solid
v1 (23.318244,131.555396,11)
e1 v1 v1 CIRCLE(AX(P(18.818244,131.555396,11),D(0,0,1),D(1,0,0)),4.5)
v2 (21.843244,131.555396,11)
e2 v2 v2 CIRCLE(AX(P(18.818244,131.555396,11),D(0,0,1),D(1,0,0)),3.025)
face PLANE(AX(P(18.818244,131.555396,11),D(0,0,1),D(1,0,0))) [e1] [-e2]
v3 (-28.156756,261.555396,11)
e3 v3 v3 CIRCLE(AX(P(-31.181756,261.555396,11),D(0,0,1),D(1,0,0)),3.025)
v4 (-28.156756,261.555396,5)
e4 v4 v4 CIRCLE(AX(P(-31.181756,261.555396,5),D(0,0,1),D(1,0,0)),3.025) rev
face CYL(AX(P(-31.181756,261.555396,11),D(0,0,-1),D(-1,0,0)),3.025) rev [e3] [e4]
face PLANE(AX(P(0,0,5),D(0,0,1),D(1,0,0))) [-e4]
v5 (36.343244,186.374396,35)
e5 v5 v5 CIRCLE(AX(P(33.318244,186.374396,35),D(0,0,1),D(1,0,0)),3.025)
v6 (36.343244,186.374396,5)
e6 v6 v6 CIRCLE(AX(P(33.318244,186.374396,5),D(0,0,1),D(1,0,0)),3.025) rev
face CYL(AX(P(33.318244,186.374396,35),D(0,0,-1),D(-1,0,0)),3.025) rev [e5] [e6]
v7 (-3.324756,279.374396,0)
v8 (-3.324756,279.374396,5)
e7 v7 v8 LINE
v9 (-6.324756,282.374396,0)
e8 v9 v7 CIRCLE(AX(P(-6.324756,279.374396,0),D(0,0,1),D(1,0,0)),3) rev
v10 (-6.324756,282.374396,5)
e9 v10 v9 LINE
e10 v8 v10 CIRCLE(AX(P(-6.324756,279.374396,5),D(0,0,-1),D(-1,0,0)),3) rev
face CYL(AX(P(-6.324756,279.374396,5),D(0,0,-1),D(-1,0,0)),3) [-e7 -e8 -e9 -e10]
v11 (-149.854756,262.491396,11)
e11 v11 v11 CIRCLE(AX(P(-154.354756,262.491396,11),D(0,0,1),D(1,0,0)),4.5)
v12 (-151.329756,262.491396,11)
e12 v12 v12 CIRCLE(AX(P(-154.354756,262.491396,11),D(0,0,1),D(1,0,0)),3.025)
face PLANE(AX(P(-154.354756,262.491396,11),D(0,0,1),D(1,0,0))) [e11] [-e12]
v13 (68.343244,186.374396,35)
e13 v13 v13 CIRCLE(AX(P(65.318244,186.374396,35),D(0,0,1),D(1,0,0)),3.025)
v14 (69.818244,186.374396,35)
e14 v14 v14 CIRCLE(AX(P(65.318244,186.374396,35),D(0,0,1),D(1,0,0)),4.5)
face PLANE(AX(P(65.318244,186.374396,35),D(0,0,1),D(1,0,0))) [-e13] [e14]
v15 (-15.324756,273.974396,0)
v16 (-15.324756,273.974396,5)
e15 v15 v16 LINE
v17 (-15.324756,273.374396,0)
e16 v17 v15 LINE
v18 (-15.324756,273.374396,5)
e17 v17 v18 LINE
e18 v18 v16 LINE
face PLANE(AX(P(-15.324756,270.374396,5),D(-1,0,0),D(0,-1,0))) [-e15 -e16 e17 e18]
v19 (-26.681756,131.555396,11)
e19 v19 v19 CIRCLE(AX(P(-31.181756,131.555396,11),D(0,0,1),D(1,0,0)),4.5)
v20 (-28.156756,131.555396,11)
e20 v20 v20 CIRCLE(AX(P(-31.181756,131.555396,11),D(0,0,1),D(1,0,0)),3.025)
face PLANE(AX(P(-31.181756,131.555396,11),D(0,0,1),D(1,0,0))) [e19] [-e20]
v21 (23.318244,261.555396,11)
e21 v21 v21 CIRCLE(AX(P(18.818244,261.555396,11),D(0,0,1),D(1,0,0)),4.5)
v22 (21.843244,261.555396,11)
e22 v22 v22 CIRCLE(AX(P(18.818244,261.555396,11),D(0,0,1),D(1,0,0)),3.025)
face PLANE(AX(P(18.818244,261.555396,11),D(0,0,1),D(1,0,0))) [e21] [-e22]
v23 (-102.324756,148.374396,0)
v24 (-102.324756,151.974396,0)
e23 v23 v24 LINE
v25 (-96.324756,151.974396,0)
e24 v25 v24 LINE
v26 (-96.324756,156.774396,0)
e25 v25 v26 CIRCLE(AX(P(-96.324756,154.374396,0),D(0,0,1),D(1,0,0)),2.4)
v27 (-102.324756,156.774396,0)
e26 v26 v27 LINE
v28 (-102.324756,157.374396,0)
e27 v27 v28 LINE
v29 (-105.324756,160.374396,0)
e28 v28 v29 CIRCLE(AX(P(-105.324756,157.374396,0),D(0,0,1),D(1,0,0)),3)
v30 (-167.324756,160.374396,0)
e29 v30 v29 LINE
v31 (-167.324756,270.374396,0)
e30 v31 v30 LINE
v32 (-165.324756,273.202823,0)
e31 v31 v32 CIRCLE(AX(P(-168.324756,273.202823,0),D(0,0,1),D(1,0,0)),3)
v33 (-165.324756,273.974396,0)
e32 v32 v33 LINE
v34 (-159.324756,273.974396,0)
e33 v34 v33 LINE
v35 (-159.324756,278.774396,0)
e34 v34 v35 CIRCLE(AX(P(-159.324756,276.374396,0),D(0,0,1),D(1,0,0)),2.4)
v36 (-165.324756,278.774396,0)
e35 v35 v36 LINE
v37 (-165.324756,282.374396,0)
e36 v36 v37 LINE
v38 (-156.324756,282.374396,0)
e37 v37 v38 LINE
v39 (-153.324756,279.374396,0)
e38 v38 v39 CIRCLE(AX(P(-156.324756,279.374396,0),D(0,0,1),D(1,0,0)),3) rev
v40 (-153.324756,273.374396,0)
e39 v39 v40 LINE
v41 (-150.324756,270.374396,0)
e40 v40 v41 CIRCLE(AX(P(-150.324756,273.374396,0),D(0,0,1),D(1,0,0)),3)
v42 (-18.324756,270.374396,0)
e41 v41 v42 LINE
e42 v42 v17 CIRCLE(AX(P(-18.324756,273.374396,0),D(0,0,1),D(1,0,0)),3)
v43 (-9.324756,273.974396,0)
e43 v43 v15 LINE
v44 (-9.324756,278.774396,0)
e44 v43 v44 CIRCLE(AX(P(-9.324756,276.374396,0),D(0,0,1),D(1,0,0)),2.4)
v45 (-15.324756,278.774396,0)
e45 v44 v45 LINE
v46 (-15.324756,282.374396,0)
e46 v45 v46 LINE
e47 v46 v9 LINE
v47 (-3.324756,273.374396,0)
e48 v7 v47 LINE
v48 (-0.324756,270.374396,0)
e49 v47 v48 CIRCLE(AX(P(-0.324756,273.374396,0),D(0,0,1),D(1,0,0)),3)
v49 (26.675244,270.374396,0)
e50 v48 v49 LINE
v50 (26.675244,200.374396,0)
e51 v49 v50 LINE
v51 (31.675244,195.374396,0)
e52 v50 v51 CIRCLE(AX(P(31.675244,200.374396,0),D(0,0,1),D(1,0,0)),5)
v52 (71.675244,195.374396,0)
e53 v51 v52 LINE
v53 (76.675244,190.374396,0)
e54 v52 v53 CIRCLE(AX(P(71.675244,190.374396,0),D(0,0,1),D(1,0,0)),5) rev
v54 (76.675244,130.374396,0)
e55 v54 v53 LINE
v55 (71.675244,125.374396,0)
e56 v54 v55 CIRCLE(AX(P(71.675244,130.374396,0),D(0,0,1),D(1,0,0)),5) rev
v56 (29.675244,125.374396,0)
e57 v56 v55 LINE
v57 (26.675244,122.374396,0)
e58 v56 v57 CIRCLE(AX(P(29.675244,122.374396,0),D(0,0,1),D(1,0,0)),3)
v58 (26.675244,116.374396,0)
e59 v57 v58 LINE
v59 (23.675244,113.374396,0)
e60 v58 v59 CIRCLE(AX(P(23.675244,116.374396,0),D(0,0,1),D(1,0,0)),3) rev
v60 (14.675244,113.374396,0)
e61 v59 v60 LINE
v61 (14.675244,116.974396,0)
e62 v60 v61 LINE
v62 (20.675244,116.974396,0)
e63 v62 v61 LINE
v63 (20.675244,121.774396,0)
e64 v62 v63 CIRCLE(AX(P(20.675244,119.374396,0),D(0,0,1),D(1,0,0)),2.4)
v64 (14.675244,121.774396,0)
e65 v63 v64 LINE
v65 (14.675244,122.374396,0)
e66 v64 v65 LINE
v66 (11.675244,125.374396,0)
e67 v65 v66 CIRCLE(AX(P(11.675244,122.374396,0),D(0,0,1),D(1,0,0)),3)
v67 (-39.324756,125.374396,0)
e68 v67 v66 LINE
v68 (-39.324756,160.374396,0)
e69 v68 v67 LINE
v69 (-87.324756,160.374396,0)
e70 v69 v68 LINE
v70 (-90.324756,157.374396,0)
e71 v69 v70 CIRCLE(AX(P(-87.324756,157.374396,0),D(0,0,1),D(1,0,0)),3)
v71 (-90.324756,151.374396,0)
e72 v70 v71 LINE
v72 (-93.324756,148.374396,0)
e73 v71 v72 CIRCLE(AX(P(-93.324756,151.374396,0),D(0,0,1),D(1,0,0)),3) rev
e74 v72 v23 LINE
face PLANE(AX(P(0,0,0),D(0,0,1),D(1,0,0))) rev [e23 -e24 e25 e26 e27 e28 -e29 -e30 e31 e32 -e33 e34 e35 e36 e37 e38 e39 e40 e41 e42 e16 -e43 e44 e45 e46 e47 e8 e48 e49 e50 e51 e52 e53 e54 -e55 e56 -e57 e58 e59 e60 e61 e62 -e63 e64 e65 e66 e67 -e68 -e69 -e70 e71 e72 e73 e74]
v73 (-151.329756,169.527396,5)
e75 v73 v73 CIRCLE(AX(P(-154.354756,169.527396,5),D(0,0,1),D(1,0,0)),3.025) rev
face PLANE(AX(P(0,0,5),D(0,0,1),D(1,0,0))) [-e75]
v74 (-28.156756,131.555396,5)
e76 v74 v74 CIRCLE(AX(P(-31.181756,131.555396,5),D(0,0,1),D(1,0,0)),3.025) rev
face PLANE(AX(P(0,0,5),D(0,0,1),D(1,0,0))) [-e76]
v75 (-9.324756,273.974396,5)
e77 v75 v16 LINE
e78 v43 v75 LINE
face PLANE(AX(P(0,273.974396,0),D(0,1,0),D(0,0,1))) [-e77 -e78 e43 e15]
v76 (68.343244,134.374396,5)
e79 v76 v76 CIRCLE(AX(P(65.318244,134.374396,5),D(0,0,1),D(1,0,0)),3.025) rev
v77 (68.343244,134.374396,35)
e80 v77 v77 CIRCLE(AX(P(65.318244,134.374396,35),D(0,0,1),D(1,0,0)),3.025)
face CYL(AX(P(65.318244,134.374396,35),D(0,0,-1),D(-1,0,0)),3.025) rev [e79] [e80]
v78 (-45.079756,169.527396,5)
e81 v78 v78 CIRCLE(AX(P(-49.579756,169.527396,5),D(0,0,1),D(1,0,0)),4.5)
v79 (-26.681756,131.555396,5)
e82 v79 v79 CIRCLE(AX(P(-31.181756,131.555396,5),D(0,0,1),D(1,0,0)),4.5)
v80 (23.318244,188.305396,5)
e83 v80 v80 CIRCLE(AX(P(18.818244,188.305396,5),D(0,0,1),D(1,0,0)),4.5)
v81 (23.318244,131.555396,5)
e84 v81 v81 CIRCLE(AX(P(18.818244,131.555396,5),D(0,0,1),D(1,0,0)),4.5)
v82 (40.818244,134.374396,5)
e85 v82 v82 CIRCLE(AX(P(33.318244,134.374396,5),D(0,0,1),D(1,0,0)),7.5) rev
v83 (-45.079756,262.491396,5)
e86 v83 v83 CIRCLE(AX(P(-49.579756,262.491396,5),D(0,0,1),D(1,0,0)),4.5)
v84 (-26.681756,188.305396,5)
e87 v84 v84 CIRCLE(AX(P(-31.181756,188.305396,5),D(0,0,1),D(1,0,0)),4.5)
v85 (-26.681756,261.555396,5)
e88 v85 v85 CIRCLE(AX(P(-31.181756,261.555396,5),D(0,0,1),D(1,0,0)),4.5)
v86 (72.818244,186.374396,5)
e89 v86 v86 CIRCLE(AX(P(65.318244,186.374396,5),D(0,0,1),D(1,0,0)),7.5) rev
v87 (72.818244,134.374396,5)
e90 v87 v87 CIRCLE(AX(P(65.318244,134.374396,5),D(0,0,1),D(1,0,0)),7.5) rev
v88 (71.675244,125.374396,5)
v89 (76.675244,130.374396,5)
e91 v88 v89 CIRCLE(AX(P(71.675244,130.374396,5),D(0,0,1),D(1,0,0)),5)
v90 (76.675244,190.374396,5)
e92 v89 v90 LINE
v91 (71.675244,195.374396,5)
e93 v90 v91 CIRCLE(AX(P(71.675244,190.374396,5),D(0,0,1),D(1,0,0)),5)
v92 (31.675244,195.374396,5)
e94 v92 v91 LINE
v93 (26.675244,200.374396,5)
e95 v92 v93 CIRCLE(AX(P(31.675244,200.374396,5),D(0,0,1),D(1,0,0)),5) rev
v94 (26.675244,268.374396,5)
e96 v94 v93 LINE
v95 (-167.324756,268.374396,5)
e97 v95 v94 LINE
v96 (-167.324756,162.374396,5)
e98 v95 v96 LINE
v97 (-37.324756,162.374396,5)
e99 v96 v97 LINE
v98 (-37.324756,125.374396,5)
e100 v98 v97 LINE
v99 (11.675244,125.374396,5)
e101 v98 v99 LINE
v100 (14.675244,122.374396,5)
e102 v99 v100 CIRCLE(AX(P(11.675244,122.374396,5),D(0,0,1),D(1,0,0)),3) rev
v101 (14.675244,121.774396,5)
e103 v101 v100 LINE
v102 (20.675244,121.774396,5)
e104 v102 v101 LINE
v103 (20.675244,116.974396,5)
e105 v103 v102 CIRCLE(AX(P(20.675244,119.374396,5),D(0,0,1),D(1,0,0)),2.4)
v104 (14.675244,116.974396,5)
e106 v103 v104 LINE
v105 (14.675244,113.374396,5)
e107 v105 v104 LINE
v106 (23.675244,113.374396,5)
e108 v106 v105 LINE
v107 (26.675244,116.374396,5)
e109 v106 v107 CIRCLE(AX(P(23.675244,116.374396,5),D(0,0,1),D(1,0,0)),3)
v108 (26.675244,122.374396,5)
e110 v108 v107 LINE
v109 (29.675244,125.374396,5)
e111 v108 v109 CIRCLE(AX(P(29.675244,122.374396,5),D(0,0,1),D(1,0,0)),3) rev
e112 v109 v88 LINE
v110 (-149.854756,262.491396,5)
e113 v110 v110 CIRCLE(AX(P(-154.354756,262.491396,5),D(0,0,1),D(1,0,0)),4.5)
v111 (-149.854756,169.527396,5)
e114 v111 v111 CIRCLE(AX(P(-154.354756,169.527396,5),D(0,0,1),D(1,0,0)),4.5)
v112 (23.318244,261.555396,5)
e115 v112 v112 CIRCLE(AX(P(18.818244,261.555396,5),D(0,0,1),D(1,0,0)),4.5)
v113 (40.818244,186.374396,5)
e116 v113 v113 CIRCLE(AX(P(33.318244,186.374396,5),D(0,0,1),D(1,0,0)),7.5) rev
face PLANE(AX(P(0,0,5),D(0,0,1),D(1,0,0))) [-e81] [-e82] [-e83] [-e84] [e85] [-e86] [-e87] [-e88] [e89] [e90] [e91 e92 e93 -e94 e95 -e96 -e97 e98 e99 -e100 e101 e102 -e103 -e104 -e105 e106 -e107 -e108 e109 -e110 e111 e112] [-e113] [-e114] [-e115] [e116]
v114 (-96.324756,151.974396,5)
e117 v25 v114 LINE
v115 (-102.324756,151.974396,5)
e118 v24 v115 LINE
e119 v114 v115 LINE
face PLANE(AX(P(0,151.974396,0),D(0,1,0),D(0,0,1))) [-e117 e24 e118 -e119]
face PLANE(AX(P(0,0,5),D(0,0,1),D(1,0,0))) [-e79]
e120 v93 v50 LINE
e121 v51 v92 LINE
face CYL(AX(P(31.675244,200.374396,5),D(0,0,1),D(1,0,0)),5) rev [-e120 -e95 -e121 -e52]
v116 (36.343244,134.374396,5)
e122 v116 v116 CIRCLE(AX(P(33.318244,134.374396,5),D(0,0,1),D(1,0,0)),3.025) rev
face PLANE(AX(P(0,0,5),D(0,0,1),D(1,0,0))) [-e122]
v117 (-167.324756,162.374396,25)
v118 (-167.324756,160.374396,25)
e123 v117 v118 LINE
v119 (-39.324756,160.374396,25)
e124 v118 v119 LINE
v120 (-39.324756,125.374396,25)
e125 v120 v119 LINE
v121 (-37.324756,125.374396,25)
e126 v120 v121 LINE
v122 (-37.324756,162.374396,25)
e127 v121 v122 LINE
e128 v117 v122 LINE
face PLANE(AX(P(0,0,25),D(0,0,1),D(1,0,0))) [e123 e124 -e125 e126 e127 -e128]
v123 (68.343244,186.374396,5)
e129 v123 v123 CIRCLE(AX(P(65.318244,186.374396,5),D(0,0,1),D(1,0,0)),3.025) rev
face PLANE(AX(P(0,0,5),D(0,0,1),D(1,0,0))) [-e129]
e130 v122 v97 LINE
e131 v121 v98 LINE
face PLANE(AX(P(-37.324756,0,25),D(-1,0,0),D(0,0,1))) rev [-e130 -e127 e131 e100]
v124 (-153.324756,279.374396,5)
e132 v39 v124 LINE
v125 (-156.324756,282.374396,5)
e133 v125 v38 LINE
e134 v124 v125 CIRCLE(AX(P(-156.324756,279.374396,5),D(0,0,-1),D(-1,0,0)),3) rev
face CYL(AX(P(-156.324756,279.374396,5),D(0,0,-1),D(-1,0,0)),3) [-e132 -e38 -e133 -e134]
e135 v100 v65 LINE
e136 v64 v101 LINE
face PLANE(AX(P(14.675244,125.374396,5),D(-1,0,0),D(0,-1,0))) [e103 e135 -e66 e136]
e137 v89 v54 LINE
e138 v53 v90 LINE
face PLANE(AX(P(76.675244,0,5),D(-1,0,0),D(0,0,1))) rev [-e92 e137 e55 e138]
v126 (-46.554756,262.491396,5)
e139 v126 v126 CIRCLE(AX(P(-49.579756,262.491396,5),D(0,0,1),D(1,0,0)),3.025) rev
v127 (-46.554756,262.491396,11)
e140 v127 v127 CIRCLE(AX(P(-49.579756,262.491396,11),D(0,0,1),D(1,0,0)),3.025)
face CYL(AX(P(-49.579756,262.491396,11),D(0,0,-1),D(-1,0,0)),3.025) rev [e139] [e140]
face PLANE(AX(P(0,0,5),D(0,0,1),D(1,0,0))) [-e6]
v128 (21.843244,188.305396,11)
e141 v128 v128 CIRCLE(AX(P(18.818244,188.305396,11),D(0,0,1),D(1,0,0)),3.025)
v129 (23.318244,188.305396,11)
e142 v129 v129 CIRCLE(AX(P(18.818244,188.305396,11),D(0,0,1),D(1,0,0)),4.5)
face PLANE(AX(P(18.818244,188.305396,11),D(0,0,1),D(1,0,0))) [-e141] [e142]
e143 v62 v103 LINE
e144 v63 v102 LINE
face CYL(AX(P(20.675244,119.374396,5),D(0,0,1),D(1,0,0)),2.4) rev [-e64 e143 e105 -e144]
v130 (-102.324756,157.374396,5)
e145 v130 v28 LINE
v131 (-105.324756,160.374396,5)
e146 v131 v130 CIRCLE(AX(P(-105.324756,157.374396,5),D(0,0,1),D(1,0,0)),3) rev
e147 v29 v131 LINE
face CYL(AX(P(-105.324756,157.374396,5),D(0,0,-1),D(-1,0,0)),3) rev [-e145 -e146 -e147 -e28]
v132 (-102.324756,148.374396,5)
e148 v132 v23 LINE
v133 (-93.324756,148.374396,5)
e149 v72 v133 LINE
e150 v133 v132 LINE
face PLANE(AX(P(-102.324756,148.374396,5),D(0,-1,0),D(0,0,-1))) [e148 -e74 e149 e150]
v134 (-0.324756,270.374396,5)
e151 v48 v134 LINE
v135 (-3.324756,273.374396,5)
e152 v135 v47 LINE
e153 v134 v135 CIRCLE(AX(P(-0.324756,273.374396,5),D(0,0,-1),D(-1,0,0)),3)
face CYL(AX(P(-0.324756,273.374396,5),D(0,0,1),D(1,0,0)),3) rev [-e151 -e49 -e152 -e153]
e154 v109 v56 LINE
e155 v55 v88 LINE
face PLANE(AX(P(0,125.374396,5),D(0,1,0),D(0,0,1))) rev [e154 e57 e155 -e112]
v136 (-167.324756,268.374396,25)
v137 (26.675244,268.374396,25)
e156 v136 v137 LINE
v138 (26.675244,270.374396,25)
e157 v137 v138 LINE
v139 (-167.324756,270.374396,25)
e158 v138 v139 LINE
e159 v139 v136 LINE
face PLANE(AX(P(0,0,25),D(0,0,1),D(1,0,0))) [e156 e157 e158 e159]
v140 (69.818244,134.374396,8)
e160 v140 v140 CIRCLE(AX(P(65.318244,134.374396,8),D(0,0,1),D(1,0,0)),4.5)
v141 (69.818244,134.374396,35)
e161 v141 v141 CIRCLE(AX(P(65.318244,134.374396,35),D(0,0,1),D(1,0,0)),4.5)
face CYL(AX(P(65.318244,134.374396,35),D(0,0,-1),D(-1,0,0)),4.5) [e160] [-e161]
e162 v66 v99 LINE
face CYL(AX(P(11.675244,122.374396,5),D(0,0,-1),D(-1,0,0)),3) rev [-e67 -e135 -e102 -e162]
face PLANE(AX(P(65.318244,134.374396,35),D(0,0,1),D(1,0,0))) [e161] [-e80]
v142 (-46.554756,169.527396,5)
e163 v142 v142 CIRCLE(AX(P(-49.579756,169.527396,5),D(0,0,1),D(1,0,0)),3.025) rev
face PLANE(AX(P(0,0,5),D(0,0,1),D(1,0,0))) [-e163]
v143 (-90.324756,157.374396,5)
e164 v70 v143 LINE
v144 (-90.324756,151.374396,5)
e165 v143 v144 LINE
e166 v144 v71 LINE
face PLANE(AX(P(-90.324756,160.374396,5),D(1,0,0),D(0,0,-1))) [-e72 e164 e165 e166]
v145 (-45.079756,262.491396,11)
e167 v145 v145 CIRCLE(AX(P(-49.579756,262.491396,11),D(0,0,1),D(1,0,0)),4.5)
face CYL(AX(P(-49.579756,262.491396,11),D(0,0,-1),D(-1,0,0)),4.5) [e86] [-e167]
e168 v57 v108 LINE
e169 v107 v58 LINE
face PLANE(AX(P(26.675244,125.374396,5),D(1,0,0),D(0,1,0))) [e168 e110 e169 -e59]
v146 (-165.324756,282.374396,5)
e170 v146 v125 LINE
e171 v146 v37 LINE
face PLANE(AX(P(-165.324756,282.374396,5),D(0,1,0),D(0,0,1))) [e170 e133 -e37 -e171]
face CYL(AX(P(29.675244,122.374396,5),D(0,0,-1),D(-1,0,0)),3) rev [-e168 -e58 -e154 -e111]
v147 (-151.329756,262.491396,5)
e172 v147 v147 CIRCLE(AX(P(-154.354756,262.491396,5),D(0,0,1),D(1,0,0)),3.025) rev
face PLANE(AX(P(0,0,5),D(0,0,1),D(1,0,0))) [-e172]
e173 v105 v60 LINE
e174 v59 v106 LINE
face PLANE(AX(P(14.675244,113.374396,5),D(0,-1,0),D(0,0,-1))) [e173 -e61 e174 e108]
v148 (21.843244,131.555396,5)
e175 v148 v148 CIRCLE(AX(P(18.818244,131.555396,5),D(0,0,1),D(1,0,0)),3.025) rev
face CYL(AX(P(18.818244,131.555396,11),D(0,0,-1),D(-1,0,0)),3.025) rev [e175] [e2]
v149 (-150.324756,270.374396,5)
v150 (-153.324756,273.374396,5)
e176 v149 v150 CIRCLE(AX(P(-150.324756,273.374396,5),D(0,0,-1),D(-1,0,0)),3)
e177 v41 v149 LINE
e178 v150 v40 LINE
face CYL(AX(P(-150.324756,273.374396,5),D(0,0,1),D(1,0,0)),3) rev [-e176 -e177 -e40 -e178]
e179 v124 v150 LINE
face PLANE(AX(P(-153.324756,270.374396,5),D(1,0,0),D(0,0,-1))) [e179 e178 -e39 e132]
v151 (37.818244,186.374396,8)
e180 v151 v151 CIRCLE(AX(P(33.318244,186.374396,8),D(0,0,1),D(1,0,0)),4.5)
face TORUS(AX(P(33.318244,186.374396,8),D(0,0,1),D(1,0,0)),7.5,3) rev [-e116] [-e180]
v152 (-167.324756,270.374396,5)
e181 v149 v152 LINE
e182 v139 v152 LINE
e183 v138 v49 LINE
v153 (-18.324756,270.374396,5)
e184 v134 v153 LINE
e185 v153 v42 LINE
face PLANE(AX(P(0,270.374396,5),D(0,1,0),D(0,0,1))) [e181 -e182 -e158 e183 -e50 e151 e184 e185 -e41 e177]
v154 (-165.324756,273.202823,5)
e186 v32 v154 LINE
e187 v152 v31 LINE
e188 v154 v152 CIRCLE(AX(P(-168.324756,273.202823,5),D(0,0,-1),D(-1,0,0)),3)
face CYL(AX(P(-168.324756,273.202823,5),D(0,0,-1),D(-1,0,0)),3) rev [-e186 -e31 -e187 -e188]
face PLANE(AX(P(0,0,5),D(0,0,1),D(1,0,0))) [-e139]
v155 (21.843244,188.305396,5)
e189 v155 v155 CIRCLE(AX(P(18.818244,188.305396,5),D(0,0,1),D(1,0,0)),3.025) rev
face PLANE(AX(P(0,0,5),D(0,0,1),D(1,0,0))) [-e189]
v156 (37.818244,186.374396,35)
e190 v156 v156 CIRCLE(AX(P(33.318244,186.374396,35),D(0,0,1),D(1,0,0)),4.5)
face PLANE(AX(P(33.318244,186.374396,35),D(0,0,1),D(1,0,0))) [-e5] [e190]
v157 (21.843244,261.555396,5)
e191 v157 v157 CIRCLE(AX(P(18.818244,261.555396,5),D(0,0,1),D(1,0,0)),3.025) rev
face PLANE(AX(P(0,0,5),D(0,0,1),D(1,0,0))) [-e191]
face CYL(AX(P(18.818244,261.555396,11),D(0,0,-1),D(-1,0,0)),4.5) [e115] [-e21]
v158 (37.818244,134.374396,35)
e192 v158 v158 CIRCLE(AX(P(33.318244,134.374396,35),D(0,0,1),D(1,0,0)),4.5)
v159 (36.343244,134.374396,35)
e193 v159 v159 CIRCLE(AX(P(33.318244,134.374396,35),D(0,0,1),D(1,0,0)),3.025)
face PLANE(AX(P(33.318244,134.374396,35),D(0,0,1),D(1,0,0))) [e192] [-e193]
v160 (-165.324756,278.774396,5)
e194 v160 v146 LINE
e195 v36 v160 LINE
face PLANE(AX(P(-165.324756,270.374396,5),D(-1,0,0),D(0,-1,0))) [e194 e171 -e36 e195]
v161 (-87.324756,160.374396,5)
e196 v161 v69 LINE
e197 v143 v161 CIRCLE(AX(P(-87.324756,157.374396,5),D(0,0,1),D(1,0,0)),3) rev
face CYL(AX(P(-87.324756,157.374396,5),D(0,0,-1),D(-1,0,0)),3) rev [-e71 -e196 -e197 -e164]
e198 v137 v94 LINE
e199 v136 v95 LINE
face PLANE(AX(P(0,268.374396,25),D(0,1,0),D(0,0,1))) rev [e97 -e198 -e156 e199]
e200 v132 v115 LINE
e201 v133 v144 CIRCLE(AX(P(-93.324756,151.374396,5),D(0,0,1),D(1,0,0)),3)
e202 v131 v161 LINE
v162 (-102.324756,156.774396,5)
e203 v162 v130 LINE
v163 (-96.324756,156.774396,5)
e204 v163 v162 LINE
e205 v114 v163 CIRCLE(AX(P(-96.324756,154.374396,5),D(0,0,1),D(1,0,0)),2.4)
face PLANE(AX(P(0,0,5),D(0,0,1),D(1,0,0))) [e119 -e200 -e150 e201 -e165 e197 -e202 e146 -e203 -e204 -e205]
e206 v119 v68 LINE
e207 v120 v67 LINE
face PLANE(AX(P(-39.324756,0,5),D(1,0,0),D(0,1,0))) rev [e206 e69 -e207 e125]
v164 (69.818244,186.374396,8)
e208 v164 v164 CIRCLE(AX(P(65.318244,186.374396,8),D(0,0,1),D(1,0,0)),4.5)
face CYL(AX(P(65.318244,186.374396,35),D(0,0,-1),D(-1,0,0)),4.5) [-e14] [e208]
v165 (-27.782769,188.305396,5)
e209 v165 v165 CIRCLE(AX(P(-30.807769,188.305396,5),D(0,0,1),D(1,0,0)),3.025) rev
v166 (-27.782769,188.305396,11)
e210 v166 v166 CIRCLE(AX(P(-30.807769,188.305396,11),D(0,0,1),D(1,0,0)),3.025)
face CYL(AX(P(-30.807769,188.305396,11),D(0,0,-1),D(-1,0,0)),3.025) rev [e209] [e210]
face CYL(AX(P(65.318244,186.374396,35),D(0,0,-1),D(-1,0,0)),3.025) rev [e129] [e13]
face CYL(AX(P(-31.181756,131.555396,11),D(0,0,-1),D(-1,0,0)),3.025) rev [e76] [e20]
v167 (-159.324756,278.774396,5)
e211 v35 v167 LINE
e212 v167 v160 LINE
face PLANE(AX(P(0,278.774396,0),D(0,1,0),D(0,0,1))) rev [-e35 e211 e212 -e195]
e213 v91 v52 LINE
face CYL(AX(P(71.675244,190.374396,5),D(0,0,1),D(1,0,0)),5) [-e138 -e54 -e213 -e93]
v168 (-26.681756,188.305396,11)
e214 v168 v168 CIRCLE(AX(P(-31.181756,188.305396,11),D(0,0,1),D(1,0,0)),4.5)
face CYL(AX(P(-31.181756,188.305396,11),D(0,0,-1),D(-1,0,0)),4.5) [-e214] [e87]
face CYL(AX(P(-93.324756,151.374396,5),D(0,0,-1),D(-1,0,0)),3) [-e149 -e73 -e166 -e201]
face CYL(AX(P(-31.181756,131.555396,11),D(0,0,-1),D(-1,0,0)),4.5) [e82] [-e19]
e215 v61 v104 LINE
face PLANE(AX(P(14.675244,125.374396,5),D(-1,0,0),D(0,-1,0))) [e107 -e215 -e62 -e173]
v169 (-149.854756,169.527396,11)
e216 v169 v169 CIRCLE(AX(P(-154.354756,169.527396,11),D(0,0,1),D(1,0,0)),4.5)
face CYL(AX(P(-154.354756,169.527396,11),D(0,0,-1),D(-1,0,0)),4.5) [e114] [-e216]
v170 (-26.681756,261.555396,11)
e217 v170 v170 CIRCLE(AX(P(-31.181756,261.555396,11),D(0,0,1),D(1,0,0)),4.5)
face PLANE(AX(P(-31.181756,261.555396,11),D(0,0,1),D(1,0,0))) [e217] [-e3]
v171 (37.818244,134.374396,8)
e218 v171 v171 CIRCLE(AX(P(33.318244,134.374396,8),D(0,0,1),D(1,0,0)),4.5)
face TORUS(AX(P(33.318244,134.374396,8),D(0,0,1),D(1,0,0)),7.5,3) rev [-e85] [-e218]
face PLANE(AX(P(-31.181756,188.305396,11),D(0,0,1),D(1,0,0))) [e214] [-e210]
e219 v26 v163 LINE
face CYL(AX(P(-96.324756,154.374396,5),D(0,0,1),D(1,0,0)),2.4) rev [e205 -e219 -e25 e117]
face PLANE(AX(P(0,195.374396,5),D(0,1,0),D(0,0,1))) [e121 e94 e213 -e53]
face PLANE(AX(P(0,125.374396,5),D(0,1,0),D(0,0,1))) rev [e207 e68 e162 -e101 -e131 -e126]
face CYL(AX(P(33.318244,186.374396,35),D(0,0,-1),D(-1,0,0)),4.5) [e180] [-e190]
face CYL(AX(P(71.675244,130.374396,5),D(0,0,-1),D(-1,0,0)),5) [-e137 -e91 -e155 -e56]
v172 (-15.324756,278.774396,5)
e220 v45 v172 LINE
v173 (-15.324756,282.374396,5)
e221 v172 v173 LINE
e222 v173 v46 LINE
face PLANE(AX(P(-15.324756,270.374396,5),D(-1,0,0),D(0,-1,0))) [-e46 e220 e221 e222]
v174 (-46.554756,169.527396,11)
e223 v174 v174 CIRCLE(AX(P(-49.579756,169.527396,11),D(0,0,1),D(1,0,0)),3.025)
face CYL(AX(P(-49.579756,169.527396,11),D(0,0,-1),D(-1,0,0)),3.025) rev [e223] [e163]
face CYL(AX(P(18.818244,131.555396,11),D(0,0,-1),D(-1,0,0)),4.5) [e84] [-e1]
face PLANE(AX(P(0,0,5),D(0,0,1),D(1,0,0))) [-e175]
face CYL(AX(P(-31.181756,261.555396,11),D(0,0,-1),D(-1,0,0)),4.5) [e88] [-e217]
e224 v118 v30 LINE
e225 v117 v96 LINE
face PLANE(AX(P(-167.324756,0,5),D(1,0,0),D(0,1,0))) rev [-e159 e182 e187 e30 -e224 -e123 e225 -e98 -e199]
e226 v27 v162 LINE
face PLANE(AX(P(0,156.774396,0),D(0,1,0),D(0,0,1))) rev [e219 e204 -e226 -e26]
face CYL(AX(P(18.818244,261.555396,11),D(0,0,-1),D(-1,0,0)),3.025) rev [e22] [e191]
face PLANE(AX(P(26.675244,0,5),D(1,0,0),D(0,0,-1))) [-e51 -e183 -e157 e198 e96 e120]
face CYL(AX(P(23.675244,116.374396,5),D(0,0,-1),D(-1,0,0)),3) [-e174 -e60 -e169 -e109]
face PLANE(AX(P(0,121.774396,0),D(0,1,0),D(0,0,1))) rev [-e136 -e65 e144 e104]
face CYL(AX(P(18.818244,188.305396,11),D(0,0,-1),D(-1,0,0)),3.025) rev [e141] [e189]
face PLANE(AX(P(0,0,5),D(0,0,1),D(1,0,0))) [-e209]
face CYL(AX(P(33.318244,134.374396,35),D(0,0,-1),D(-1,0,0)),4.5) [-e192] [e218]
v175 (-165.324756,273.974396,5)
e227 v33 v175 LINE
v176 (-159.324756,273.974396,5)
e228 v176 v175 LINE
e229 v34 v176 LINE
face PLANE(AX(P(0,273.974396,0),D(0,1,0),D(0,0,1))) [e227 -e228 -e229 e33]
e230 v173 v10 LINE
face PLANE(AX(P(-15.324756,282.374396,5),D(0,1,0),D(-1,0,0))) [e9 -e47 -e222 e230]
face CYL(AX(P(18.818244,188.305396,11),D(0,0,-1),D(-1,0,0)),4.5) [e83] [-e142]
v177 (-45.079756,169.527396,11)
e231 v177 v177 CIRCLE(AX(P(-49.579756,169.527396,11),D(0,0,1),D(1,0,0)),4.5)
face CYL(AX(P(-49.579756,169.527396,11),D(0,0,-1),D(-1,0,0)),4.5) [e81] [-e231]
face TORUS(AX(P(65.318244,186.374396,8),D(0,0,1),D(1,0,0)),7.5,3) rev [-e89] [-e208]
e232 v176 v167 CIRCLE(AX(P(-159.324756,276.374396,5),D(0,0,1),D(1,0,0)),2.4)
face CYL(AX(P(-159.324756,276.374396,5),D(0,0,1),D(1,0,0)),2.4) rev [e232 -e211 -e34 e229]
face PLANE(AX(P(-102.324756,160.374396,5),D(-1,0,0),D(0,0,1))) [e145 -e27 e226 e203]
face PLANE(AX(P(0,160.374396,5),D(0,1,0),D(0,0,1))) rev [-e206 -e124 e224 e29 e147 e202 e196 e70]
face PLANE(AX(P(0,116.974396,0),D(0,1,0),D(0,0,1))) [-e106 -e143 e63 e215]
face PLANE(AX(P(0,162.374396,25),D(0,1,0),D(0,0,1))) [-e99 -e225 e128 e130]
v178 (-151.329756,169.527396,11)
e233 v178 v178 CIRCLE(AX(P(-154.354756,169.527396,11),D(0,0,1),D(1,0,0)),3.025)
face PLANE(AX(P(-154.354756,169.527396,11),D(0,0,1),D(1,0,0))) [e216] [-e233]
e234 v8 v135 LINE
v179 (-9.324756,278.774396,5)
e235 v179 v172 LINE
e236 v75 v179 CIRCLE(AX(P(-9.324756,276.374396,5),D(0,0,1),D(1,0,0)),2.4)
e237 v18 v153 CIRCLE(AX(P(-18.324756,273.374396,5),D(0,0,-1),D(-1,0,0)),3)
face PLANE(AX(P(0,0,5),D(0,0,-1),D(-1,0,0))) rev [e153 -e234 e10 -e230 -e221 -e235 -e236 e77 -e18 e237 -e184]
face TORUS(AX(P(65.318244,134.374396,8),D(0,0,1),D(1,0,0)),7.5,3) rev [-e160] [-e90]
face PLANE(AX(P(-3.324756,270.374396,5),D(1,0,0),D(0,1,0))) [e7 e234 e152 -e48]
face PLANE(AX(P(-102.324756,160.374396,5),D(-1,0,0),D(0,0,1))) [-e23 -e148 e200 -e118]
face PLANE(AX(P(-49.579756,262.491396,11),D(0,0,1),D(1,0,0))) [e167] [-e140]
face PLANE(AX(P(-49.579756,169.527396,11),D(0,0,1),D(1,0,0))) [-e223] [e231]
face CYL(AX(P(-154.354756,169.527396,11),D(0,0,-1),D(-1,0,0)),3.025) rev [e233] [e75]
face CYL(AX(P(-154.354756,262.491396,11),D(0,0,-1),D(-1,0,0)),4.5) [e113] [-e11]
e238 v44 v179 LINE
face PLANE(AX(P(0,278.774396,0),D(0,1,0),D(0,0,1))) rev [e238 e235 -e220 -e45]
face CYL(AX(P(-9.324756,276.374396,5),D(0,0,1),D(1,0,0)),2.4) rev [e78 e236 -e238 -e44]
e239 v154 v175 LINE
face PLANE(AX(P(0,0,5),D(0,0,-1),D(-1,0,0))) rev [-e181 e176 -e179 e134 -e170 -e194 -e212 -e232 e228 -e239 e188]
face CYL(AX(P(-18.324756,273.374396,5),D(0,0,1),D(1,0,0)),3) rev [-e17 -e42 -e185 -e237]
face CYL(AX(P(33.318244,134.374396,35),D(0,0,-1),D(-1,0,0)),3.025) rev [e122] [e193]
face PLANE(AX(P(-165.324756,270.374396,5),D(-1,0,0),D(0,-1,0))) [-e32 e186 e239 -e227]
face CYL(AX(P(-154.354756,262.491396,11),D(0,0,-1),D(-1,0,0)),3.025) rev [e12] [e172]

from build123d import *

# Parameters (mm, degrees)
SKETCH1_W            = 128
SKETCH1_H            = 110
SKETCH1_W_2          = 50
SKETCH1_H_2          = 70
BOSS_EXTRUDE1_DEPTH  = 5
SKETCH3_W            = 128
SKETCH3_H            = 2
SKETCH3_W_2          = 194
BOSS_EXTRUDE3_DEPTH  = 20
SKETCH6_W            = 12
SKETCH6_H            = 12
BOSS_EXTRUDE5_DEPTH  = 5
M4_CLEARANCE_HOLE1_D = 4.8
CUT_EXTRUDE1_DEPTH   = 329.83563266
FILLET2_R            = 3
FILLET3_R            = 5
SKETCH15_R           = 4.5
SKETCH15_R_2         = 3.025
BOSS_EXTRUDE6_DEPTH  = 6
SKETCH16_R           = 4.5
SKETCH16_R_2         = 3.025
BOSS_EXTRUDE7_DEPTH  = 30
FILLET4_R            = 3


with BuildPart() as part:
    # Sketch1 → Boss-Extrude1 (new body)
    with BuildSketch(Plane.XY):
        with Locations((-103.32475602, 215.37439567)):
            Rectangle(SKETCH1_W, SKETCH1_H)
        Polygon((26.67524398, 270.37439567), (-39.32475602, 270.37439567), (-39.32475602, 160.37439567), (-39.32475602, 125.37439567), (26.67524398, 125.37439567), (26.67524398, 195.37439567), align=None)
        with Locations((51.67524398, 160.37439567)):
            Rectangle(SKETCH1_W_2, SKETCH1_H_2)
    extrude(amount=BOSS_EXTRUDE1_DEPTH)

    # Sketch3 → Boss-Extrude3 (add)
    with BuildSketch(Plane.XY.offset(5)):
        Polygon((-37.32475602, 162.37439567), (-39.32475602, 162.37439567), (-39.32475602, 160.37439567), (-39.32475602, 125.37439567), (-37.32475602, 125.37439567), align=None)
        with Locations((-103.32475602, 161.37439567)):
            Rectangle(SKETCH3_W, SKETCH3_H)
        with Locations((-70.32475602, 269.37439567)):
            Rectangle(SKETCH3_W_2, SKETCH3_H)
    extrude(amount=BOSS_EXTRUDE3_DEPTH)

    # Sketch6 → Boss-Extrude5 (add)
    with BuildSketch(Plane(origin=(0, 0, 0), x_dir=(-1, 0, 0), z_dir=(0, 0, -1))):
        with Locations((96.32475602, 154.37439567)):
            Rectangle(SKETCH6_W, SKETCH6_H)
        with Locations((159.32475602, 276.37439567)):
            Rectangle(SKETCH6_W, SKETCH6_H)
        with Locations((-20.67524398, 119.37439567)):
            Rectangle(SKETCH6_W, SKETCH6_H)
        with Locations((9.32475602, 276.37439567)):
            Rectangle(SKETCH6_W, SKETCH6_H)
    extrude(amount=-BOSS_EXTRUDE5_DEPTH)

    # M4 Clearance Hole1 (through all)
    with Locations(Plane.XY.offset(5)):
        with Locations((-96.32475602, 154.37439567), (-159.32475602, 276.37439567), (-9.32475602, 276.37439567), (20.67524398, 119.37439567)):
            Hole(M4_CLEARANCE_HOLE1_D / 2)

    # Sketch10 → Cut-Extrude1 (cut, through all)
    with BuildSketch(Plane.XY.offset(5)):
        with BuildLine():
            ThreePointArc((-96.32475602, 151.97439567), (-98.72475602, 154.37439567), (-96.32475602, 156.77439567))
            Line((-96.32475602, 156.77439567), (-102.32475602, 156.77439567))
            Line((-102.32475602, 156.77439567), (-102.32475602, 151.97439567))
            Line((-102.32475602, 151.97439567), (-96.32475602, 151.97439567))
        make_face()
        with BuildLine():
            ThreePointArc((-159.32475602, 273.97439567), (-161.72475602, 276.37439567), (-159.32475602, 278.77439567))
            Line((-159.32475602, 278.77439567), (-165.32475602, 278.77439567))
            Line((-165.32475602, 278.77439567), (-165.32475602, 273.97439567))
            Line((-165.32475602, 273.97439567), (-159.32475602, 273.97439567))
        make_face()
        with BuildLine():
            ThreePointArc((-9.32475602, 273.97439567), (-11.72475602, 276.37439567), (-9.32475602, 278.77439567))
            Line((-9.32475602, 278.77439567), (-15.32475602, 278.77439567))
            Line((-15.32475602, 278.77439567), (-15.32475602, 273.97439567))
            Line((-15.32475602, 273.97439567), (-9.32475602, 273.97439567))
        make_face()
        with BuildLine():
            ThreePointArc((20.67524398, 116.97439567), (18.27524398, 119.37439567), (20.67524398, 121.77439567))
            Line((20.67524398, 121.77439567), (14.67524398, 121.77439567))
            Line((14.67524398, 121.77439567), (14.67524398, 116.97439567))
            Line((14.67524398, 116.97439567), (20.67524398, 116.97439567))
        make_face()
    extrude(amount=-CUT_EXTRUDE1_DEPTH, mode=Mode.SUBTRACT)

    # Fillet2
    # the kernel refuses this fillet: 3 mm, written as the material it adds along each edge
    with BuildSketch(Plane(origin=(-15.32475602, 270.37439567, 0), x_dir=(-1, 0, 0), z_dir=(0, 0, 1)), Plane(origin=(-90.32475602, 160.37439567, 0), x_dir=(1, 0, 0), z_dir=(0, 0, 1))) as fillet2_piece_1:
        with BuildLine():
            CenterArc((FILLET2_R, -FILLET2_R), FILLET2_R, 90, 90)
            Line((0, -FILLET2_R), (0, 0))
            Line((0, 0), (FILLET2_R, 0))
        make_face()
    extrude(amount=5)
    with BuildSketch(Plane(origin=(-3.32475602, 270.37439567, 0), x_dir=(1, 0, 0), z_dir=(0, 0, 1)), Plane(origin=(-102.32475602, 160.37439567, 0), x_dir=(-1, 0, 0), z_dir=(0, 0, 1)), Plane(origin=(-153.32475602, 270.37439567, 0), x_dir=(1, 0, 0), z_dir=(0, 0, 1)), Plane(origin=(14.67524398, 125.37439567, 0), x_dir=(-1, 0, 0), z_dir=(0, 0, 1)), Plane(origin=(26.67524398, 125.37439567, 0), x_dir=(0, -1, 0), z_dir=(0, 0, 1))) as fillet2_piece_2:
        with BuildLine():
            CenterArc((FILLET2_R, FILLET2_R), FILLET2_R, 180, 90)
            Line((0, FILLET2_R), (0, 0))
            Line((0, 0), (FILLET2_R, 0))
        make_face()
    extrude(amount=5)
    with BuildSketch(Plane(origin=(-165.32475602, 270.37439567, 0), x_dir=(-1, 0, 0), z_dir=(0, 0, 1))) as fillet2_piece_3:
        with BuildLine():
            CenterArc((3, -2.828427125), FILLET2_R, 109.471220634, 70.528779366)
            Line((0, -2.828427125), (0, 0))
            Line((0, 0), (2, 0))
        make_face()
    extrude(amount=5)
    # the kernel refuses this fillet: 3 mm, written as the material it takes off along each edge
    with BuildSketch(Plane(origin=(-3.32475602, 282.37439567, -7.5), x_dir=(-1, 0, 0), z_dir=(0, 0, 1)), Plane(origin=(-90.32475602, 148.37439567, -7.5), x_dir=(0, 1, 0), z_dir=(0, 0, 1)), Plane(origin=(-153.32475602, 282.37439567, -7.5), x_dir=(-1, 0, 0), z_dir=(0, 0, 1)), Plane(origin=(26.67524398, 113.37439567, -7.5), x_dir=(0, 1, 0), z_dir=(0, 0, 1))) as fillet2_2_piece_1:
        with BuildLine():
            CenterArc((FILLET2_R, FILLET2_R), FILLET2_R, 180, 90)
            Line((0, FILLET2_R), (0, 0))
            Line((0, 0), (FILLET2_R, 0))
        make_face()
    extrude(amount=20, mode=Mode.SUBTRACT)

    # Fillet3
    fillet3_edges = [part.edges().sort_by_distance(p)[0] for p in [
        (26.67524398, 195.37439567, 2.5),
        (76.67524398, 195.37439567, 2.5),
        (76.67524398, 125.37439567, 2.5),
    ]]
    fillet(fillet3_edges, radius=FILLET3_R)

    # Sketch15 → Boss-Extrude6 (add)
    # profile 1 of 10: a face of its own
    with BuildSketch(Plane.XY.offset(5)):
        with Locations((-154.35475602, 169.52739567)):
            Circle(SKETCH15_R)
        with Locations((-154.35475602, 169.52739567)):
            Circle(SKETCH15_R_2, mode=Mode.SUBTRACT)
    # profile 2 of 10: a face of its own
    with BuildSketch(Plane.XY.offset(5)):
        with Locations((-49.57975602, 262.49139567)):
            Circle(SKETCH15_R)
        with Locations((-49.57975602, 262.49139567)):
            Circle(SKETCH15_R_2, mode=Mode.SUBTRACT)
    # profile 3 of 10: a face of its own
    with BuildSketch(Plane.XY.offset(5)):
        with Locations((-49.57975602, 169.52739567)):
            Circle(SKETCH15_R)
        with Locations((-49.57975602, 169.52739567)):
            Circle(SKETCH15_R_2, mode=Mode.SUBTRACT)
    # profile 4 of 10: a face of its own
    with BuildSketch(Plane.XY.offset(5)):
        with Locations((-31.18175602, 131.55539567)):
            Circle(SKETCH15_R)
        with Locations((-31.18175602, 131.55539567)):
            Circle(SKETCH15_R_2, mode=Mode.SUBTRACT)
    # profile 5 of 10: a face of its own
    with BuildSketch(Plane.XY.offset(5)):
        with Locations((-31.18175602, 188.30539567)):
            Circle(SKETCH15_R)
        with Locations((-30.807769142, 188.30539567)):
            Circle(SKETCH15_R_2, mode=Mode.SUBTRACT)
    # profile 6 of 10: a face of its own
    with BuildSketch(Plane.XY.offset(5)):
        with Locations((18.81824398, 188.30539567)):
            Circle(SKETCH15_R)
        with Locations((18.81824398, 188.30539567)):
            Circle(SKETCH15_R_2, mode=Mode.SUBTRACT)
    # profile 7 of 10: a face of its own
    with BuildSketch(Plane.XY.offset(5)):
        with Locations((18.81824398, 131.55539567)):
            Circle(SKETCH15_R)
        with Locations((18.81824398, 131.55539567)):
            Circle(SKETCH15_R_2, mode=Mode.SUBTRACT)
    # profile 8 of 10: a face of its own
    with BuildSketch(Plane.XY.offset(5)):
        with Locations((-31.18175602, 261.55539567)):
            Circle(SKETCH15_R)
        with Locations((-31.18175602, 261.55539567)):
            Circle(SKETCH15_R_2, mode=Mode.SUBTRACT)
    # profile 9 of 10: a face of its own
    with BuildSketch(Plane.XY.offset(5)):
        with Locations((18.81824398, 261.55539567)):
            Circle(SKETCH15_R)
        with Locations((18.81824398, 261.55539567)):
            Circle(SKETCH15_R_2, mode=Mode.SUBTRACT)
    # profile 10 of 10: a face of its own
    with BuildSketch(Plane.XY.offset(5)):
        with Locations((-154.35475602, 262.49139567)):
            Circle(SKETCH15_R)
        with Locations((-154.35475602, 262.49139567)):
            Circle(SKETCH15_R_2, mode=Mode.SUBTRACT)
    extrude(amount=BOSS_EXTRUDE6_DEPTH)

    # Sketch16 → Boss-Extrude7 (add)
    # profile 1 of 4: a face of its own
    with BuildSketch(Plane.XY.offset(5)):
        with Locations((33.31824398, 134.37439567)):
            Circle(SKETCH16_R)
        with Locations((33.31824398, 134.37439567)):
            Circle(SKETCH16_R_2, mode=Mode.SUBTRACT)
    # profile 2 of 4: a face of its own
    with BuildSketch(Plane.XY.offset(5)):
        with Locations((65.31824398, 134.37439567)):
            Circle(SKETCH16_R)
        with Locations((65.31824398, 134.37439567)):
            Circle(SKETCH16_R_2, mode=Mode.SUBTRACT)
    # profile 3 of 4: a face of its own
    with BuildSketch(Plane.XY.offset(5)):
        with Locations((65.31824398, 186.37439567)):
            Circle(SKETCH16_R)
        with Locations((65.31824398, 186.37439567)):
            Circle(SKETCH16_R_2, mode=Mode.SUBTRACT)
    # profile 4 of 4: a face of its own
    with BuildSketch(Plane.XY.offset(5)):
        with Locations((33.31824398, 186.37439567)):
            Circle(SKETCH16_R)
        with Locations((33.31824398, 186.37439567)):
            Circle(SKETCH16_R_2, mode=Mode.SUBTRACT)
    extrude(amount=BOSS_EXTRUDE7_DEPTH)

    # Fillet4
    fillet4_edges = [part.edges().sort_by_distance(p)[0] for p in [
        (28.81824398, 134.37439567, 5),
        (60.81824398, 134.37439567, 5),
        (60.81824398, 186.37439567, 5),
        (28.81824398, 186.37439567, 5),
    ]]
    fillet(fillet4_edges, radius=FILLET4_R)


solid = part.part
